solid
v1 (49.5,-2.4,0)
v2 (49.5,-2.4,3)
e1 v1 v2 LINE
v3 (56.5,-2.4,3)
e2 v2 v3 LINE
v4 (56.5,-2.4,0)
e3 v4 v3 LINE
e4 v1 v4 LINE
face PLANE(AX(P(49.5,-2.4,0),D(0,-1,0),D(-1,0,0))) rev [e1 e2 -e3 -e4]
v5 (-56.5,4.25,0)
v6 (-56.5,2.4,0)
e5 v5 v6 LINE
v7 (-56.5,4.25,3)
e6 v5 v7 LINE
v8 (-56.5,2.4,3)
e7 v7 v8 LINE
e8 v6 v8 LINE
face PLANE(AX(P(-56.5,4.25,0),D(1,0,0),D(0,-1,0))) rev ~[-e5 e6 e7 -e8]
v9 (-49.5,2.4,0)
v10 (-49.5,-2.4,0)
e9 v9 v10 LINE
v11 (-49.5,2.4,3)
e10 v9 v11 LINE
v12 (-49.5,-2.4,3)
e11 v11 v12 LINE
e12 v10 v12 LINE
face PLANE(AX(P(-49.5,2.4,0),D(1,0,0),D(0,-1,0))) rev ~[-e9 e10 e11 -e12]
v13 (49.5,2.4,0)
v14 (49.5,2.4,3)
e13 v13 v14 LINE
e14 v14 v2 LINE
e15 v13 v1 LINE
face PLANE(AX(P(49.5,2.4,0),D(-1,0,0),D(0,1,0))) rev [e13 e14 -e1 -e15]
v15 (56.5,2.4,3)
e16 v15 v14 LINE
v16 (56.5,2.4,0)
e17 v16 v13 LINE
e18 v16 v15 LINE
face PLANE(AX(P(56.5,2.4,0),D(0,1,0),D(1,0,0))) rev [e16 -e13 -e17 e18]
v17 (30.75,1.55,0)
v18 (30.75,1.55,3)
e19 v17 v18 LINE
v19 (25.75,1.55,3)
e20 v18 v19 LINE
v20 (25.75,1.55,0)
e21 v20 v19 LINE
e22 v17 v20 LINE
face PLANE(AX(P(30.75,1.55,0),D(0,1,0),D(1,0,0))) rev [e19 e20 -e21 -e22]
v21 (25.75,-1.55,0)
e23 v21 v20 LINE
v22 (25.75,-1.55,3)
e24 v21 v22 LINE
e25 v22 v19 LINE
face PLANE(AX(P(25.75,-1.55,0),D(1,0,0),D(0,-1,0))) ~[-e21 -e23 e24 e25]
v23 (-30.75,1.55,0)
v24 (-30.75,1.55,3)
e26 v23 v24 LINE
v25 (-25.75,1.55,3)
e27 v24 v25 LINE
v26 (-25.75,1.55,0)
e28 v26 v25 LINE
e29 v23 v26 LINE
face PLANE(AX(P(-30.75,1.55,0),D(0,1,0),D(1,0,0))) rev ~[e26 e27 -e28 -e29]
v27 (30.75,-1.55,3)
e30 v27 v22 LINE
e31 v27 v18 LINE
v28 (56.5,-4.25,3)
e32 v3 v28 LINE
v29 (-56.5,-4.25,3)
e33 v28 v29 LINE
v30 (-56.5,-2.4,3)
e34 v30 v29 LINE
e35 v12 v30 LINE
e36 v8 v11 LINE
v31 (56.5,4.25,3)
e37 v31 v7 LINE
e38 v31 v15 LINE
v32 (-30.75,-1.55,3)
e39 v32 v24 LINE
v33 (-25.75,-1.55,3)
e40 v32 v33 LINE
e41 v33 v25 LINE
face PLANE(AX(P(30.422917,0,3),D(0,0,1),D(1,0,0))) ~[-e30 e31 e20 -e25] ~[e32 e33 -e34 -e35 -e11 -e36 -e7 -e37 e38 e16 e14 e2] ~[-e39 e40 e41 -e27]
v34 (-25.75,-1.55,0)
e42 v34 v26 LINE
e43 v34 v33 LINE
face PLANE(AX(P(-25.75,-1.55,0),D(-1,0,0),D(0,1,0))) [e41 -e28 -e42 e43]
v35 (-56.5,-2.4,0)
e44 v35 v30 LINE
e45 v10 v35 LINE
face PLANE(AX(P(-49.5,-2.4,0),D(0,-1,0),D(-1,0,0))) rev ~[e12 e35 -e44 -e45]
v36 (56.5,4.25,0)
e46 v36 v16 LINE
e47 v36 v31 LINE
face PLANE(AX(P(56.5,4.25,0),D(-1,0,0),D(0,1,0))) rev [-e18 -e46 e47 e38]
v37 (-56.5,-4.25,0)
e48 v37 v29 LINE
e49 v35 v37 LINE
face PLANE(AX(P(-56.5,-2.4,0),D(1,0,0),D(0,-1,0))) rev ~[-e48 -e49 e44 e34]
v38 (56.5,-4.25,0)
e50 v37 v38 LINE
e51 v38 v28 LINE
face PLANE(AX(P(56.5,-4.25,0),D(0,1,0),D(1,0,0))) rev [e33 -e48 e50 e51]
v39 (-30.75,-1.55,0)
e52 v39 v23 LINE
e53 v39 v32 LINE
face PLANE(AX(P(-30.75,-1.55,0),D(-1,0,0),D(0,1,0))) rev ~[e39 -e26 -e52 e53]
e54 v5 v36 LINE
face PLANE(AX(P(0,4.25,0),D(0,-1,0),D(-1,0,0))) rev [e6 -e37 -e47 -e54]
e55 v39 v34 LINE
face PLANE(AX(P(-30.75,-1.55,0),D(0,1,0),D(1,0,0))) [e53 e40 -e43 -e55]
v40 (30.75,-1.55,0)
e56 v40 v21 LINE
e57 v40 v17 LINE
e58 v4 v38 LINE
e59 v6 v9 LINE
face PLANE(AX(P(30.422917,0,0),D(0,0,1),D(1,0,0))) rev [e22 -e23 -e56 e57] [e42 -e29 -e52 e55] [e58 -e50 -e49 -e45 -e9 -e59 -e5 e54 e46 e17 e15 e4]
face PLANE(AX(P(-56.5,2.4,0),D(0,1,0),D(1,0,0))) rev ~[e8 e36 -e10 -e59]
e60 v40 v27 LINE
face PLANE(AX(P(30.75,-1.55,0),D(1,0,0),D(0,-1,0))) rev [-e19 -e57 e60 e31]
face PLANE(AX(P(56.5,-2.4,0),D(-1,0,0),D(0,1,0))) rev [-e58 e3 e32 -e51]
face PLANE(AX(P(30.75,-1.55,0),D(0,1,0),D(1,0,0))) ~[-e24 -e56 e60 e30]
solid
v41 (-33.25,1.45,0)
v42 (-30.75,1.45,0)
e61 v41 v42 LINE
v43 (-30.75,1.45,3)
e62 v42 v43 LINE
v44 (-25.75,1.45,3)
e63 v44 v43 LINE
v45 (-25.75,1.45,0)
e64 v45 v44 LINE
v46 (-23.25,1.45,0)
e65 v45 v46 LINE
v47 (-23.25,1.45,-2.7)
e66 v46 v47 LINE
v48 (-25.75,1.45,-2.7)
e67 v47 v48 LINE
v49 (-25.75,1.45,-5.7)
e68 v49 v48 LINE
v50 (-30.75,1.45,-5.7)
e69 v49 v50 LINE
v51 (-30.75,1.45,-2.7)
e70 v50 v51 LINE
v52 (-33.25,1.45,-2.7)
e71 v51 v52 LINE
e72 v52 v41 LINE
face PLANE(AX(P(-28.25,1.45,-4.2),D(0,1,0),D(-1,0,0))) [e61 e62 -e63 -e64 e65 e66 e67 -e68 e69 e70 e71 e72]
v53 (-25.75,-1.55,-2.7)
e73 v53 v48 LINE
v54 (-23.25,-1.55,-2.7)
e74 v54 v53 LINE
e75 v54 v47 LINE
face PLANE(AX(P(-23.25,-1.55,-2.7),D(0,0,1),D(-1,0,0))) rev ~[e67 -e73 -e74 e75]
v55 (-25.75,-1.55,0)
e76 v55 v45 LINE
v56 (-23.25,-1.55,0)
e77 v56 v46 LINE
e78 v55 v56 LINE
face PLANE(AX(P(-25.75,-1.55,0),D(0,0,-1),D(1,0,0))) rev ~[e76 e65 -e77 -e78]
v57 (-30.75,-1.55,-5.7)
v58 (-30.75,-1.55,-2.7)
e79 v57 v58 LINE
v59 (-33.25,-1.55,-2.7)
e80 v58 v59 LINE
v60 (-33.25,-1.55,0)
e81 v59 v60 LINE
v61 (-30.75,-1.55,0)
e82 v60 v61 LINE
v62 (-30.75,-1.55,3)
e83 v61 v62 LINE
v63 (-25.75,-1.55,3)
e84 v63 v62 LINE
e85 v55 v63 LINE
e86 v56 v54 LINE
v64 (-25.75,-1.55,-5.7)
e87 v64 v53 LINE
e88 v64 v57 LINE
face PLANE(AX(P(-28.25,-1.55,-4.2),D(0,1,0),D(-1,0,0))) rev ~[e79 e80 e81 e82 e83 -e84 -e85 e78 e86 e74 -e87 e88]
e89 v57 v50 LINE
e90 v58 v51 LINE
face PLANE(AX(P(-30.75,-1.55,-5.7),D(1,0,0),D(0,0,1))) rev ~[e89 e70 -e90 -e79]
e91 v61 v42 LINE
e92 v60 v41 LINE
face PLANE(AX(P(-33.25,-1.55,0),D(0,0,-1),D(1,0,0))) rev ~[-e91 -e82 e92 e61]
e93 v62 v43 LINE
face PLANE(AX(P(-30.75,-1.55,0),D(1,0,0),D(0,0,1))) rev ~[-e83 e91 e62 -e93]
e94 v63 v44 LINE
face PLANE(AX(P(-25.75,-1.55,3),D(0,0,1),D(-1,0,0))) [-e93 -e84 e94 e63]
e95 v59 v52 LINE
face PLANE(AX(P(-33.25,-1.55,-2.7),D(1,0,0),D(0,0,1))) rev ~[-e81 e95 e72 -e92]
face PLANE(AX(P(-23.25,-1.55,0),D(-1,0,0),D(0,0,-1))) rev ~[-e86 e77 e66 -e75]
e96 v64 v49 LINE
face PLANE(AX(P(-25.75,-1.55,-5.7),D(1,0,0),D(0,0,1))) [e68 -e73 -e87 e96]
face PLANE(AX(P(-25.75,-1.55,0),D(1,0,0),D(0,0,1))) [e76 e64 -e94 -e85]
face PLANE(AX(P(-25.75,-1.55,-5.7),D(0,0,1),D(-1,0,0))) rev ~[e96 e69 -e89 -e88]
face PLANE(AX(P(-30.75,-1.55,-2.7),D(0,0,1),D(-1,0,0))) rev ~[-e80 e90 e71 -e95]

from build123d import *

# Parameters (mm, degrees)
F0_W     = 5
F0_H     = 3.1
F1_DEPTH = 3
F3_W     = 5
F3_H     = 3
F4_DEPTH = 3


# Not quite as in the source:
# - a feature names something its author has since deleted; it is built from what else it names


with BuildPart() as f1:
    # F0 (on Top) → F1 (new body)
    with BuildSketch(Plane.XY):
        Polygon((0, -4.25), (0, 4.25), (-56.5, 4.25), (-56.5, 2.4), (-49.5, 2.4), (-49.5, -2.4), (-56.5, -2.4), (-56.5, -4.25), align=None)
        with Locations((-28.25, 0)):
            Rectangle(F0_W, F0_H, mode=Mode.SUBTRACT)
    extrude(amount=F1_DEPTH)

    # F2: F1 across face


with BuildPart() as f1_1:
    add(f1.part)
    add(f1.part.mirror(Plane(origin=(0, 0, 1.5), x_dir=(0, 1, 0), z_dir=(1, 0, 0))))


with BuildPart() as f4:
    # F3 (on face) → F4 (new body)
    with BuildSketch(Plane(origin=(0, -1.55, 0), x_dir=(-1, 0, 0), z_dir=(0, 1, 0))):
        with Locations((28.25, -4.2)):
            Rectangle(F3_W, F3_H)
        Polygon((30.75, 0), (25.75, 0), (23.25, 0), (23.25, -2.7), (25.75, -2.7), (30.75, -2.7), (33.25, -2.7), (33.25, 0), align=None)
        with Locations((28.25, 1.5)):
            Rectangle(F3_W, F3_H)
    extrude(amount=F4_DEPTH)


solid = Compound([f1_1.part, f4.part])
